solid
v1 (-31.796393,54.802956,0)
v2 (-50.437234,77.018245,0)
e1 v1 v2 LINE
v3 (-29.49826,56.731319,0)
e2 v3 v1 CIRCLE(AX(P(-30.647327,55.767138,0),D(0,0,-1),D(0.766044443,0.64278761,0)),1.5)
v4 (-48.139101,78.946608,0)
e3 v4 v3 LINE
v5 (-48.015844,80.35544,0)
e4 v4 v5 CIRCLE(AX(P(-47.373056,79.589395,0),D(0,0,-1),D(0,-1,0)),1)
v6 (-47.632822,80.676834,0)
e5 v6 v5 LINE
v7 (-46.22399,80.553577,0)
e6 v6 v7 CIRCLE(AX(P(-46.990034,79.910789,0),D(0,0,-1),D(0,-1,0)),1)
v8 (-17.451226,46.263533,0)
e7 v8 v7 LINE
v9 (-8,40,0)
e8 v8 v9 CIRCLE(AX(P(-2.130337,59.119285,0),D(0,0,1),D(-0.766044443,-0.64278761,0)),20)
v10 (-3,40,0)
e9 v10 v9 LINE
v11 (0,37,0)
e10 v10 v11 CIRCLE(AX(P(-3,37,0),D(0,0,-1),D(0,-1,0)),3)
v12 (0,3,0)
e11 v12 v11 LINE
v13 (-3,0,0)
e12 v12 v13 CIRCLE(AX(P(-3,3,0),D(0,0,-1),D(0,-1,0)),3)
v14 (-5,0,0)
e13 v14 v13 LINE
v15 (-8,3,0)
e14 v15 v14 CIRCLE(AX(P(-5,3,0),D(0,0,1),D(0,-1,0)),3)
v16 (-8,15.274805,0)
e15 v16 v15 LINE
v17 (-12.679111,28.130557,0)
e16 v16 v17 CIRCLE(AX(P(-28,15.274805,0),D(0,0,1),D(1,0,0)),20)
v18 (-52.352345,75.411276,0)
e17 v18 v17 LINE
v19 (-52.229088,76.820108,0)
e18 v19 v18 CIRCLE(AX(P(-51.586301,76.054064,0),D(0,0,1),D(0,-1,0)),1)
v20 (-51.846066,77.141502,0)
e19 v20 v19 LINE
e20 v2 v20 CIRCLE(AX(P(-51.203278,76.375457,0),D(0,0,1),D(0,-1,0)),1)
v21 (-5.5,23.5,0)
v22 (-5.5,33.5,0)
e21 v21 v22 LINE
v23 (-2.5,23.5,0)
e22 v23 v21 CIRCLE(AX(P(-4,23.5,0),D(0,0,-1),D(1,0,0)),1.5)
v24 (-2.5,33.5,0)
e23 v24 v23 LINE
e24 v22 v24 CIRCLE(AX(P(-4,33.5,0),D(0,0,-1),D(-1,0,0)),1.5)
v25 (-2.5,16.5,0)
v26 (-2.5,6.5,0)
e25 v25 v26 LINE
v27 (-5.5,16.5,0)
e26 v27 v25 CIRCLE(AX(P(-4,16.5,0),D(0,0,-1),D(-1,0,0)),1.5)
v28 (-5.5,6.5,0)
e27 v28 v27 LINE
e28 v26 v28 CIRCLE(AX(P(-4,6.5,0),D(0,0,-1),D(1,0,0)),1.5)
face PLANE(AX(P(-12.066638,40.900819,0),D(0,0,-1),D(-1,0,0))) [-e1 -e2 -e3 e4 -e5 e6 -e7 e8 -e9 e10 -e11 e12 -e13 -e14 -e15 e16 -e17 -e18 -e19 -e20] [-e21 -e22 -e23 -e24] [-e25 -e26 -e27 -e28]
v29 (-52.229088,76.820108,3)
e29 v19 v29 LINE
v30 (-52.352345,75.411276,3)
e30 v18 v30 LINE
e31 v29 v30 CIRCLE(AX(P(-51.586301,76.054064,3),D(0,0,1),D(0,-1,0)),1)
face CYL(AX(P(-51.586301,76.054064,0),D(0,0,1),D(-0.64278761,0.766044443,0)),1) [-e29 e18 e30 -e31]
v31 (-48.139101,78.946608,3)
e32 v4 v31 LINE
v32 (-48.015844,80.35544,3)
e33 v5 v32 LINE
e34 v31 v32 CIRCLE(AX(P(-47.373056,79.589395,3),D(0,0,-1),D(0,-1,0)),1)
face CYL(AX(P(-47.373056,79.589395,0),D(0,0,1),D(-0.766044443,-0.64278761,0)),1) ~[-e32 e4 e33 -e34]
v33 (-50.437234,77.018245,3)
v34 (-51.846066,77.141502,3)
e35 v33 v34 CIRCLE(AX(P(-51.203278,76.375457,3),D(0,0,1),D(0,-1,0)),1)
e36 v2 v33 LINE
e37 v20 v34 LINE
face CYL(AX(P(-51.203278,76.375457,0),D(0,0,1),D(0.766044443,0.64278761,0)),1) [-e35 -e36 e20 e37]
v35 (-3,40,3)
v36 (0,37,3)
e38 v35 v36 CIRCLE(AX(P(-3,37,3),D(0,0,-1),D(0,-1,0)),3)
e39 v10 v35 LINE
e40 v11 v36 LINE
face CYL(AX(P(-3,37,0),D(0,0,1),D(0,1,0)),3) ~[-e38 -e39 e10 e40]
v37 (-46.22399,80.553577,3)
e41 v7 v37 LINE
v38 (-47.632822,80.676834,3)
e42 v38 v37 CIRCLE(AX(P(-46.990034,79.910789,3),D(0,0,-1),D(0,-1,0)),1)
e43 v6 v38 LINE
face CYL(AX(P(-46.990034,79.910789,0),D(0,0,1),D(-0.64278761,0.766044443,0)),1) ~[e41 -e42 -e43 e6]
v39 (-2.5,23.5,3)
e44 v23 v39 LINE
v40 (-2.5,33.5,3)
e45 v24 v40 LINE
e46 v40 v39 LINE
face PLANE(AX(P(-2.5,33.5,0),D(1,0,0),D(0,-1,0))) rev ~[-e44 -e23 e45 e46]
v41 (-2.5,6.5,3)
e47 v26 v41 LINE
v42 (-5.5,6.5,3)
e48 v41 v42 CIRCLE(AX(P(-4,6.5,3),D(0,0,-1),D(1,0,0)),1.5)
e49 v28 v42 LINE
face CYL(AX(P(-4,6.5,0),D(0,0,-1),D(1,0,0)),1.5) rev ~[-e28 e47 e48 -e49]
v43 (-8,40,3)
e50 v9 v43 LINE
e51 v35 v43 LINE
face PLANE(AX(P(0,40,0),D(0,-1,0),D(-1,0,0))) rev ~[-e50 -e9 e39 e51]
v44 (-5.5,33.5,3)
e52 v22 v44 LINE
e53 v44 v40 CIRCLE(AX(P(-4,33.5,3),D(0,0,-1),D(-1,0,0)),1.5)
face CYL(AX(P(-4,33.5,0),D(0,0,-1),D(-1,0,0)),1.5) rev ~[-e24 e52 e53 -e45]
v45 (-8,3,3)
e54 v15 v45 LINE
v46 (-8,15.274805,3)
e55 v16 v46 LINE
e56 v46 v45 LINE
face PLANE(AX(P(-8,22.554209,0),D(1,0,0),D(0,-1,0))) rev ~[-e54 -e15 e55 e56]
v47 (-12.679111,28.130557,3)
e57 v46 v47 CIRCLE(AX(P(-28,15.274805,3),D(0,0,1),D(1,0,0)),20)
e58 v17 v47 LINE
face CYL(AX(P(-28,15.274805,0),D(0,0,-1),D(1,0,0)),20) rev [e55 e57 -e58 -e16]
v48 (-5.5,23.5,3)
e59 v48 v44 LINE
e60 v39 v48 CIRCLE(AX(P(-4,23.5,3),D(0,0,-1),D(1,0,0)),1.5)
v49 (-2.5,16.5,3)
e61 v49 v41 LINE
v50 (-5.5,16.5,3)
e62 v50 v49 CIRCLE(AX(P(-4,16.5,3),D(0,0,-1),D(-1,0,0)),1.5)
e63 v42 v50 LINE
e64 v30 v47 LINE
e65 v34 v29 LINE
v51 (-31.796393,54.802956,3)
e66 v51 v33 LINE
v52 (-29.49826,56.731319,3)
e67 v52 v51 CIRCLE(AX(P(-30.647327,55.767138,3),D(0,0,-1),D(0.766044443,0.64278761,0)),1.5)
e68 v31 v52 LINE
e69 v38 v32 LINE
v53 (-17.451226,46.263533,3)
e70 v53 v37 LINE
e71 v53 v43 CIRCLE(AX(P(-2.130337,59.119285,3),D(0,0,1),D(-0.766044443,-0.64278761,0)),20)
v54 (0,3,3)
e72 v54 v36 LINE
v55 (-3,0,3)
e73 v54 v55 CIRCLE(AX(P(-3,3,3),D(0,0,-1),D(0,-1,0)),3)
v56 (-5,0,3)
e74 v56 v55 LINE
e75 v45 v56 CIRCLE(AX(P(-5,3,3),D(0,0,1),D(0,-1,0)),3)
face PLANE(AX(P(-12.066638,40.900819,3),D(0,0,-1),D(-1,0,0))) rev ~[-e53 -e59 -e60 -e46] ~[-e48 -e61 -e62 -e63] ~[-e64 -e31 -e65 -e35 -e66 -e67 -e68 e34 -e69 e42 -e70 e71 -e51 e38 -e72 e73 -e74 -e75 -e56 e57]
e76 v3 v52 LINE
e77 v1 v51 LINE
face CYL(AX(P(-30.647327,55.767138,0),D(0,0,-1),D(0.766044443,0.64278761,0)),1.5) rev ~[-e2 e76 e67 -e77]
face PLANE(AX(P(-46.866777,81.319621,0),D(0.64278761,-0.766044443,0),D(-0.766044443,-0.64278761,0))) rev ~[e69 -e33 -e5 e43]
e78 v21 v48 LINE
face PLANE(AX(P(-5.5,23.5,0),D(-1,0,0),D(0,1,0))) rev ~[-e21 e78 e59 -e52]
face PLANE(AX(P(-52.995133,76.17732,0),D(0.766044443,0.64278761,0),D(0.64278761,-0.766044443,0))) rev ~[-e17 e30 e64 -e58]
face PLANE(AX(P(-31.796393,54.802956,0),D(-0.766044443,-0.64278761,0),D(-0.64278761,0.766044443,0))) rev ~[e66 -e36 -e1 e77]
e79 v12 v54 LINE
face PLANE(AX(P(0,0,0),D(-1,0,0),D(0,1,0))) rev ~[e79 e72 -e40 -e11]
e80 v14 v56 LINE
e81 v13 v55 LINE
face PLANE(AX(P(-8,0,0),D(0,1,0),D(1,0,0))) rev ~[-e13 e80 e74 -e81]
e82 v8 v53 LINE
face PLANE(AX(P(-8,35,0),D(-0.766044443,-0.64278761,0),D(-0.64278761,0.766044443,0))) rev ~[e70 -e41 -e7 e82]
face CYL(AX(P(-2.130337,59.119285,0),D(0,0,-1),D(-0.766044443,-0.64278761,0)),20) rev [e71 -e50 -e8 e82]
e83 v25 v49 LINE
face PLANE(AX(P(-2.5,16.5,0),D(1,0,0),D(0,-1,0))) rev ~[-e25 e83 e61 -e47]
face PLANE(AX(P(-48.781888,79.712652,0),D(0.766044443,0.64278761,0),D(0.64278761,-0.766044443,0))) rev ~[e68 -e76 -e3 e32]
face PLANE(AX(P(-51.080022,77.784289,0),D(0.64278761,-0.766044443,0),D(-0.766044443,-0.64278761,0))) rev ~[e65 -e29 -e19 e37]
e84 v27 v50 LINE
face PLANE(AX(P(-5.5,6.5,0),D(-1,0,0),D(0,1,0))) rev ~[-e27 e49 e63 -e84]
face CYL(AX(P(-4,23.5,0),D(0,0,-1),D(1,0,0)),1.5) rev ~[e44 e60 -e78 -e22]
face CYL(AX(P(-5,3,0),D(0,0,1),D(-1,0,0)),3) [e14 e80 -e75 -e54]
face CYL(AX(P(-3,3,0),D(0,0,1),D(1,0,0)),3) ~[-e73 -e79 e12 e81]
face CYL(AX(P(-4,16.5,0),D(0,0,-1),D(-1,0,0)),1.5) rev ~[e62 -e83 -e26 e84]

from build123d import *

# Parameters (mm, degrees)
F1_DEPTH    = 3
F2_R        = 1
F3_T1_DEPTH = 3
F4_R        = 3


# Not quite as in the source:
# - a fillet or chamfer that OpenCascade refuses, or shapes differently, is made with other operations: its cross-section is extruded or revolved along the edge and cut away or added


with BuildPart() as f1:
    # F0 (on Top) → F1 (new body)
    with BuildSketch(Plane.XY):
        with BuildLine():
            ThreePointArc((-29.4982599503, 56.7313189632), (-29.6831452005, 54.6180708839), (-31.7963932797, 54.8029561341))
            Line((-31.7963932797, 54.8029561341), (-51.0800215703, 77.7842894277))
            Line((-51.0800215703, 77.7842894277), (-52.9951326781, 76.1773204034))
            Line((-52.9951326781, 76.1773204034), (-8, 22.5542093851))
            Line((-8, 22.5542093851), (-8, 0))
            Line((-8, 0), (0, 0))
            Line((0, 0), (0, 40))
            Line((0, 40), (-8, 40))
            Line((-8, 40), (-8, 35))
            Line((-8, 35), (-46.8667771331, 81.3196212809))
            Line((-46.8667771331, 81.3196212809), (-48.7818882409, 79.7126522567))
            Line((-48.7818882409, 79.7126522567), (-29.4982599503, 56.7313189632))
        make_face()
        with BuildLine():
            Line((-2.5, 16.5), (-2.5, 6.5))
            ThreePointArc((-2.5, 6.5), (-4, 5), (-5.5, 6.5))
            Line((-5.5, 6.5), (-5.5, 16.5))
            ThreePointArc((-5.5, 16.5), (-4, 18), (-2.5, 16.5))
        make_face(mode=Mode.SUBTRACT)
        with BuildLine():
            Line((-2.5, 33.5), (-2.5, 23.5))
            ThreePointArc((-2.5, 23.5), (-4, 22), (-5.5, 23.5))
            Line((-5.5, 23.5), (-5.5, 33.5))
            ThreePointArc((-5.5, 33.5), (-4, 35), (-2.5, 33.5))
        make_face(mode=Mode.SUBTRACT)
    extrude(amount=F1_DEPTH)

    # F2
    f2_edges = [f1.edges().sort_by_distance(p)[0] for p in [
        (-52.995133, 76.17732, 1.5),
        (-51.080022, 77.784289, 1.5),
        (-48.781888, 79.712652, 1.5),
        (-46.866777, 81.319621, 1.5),
    ]]
    fillet(f2_edges, radius=F2_R)

    # F3: fillet of radius 20 on 2 edges, made by hand

    # F3_s2 → F3_t1 (join)
    with BuildSketch(Plane.XY):
        with BuildLine():
            ThreePointArc((-17.4512262706, 46.2635328624), (-13.1787684603, 42.4479872276), (-8, 40))
            Line((-8, 40), (-8, 35))
            Line((-8, 35), (-17.4512262706, 46.2635328624))
        make_face()
        with BuildLine():
            ThreePointArc((-8, 15.2748046998), (-9.2061475843, 22.1152075663), (-12.6791111376, 28.1305568935))
            Line((-12.6791111376, 28.1305568935), (-8, 22.5542093851))
            Line((-8, 22.5542093851), (-8, 15.2748046998))
        make_face()
    extrude(amount=F3_T1_DEPTH)

    # F4
    f4_edges = [f1.edges().sort_by_distance(p)[0] for p in [
        (0, 40, 1.5),
        (-8, 0, 1.5),
        (0, 0, 1.5),
    ]]
    fillet(f4_edges, radius=F4_R)


solid = f1.part
